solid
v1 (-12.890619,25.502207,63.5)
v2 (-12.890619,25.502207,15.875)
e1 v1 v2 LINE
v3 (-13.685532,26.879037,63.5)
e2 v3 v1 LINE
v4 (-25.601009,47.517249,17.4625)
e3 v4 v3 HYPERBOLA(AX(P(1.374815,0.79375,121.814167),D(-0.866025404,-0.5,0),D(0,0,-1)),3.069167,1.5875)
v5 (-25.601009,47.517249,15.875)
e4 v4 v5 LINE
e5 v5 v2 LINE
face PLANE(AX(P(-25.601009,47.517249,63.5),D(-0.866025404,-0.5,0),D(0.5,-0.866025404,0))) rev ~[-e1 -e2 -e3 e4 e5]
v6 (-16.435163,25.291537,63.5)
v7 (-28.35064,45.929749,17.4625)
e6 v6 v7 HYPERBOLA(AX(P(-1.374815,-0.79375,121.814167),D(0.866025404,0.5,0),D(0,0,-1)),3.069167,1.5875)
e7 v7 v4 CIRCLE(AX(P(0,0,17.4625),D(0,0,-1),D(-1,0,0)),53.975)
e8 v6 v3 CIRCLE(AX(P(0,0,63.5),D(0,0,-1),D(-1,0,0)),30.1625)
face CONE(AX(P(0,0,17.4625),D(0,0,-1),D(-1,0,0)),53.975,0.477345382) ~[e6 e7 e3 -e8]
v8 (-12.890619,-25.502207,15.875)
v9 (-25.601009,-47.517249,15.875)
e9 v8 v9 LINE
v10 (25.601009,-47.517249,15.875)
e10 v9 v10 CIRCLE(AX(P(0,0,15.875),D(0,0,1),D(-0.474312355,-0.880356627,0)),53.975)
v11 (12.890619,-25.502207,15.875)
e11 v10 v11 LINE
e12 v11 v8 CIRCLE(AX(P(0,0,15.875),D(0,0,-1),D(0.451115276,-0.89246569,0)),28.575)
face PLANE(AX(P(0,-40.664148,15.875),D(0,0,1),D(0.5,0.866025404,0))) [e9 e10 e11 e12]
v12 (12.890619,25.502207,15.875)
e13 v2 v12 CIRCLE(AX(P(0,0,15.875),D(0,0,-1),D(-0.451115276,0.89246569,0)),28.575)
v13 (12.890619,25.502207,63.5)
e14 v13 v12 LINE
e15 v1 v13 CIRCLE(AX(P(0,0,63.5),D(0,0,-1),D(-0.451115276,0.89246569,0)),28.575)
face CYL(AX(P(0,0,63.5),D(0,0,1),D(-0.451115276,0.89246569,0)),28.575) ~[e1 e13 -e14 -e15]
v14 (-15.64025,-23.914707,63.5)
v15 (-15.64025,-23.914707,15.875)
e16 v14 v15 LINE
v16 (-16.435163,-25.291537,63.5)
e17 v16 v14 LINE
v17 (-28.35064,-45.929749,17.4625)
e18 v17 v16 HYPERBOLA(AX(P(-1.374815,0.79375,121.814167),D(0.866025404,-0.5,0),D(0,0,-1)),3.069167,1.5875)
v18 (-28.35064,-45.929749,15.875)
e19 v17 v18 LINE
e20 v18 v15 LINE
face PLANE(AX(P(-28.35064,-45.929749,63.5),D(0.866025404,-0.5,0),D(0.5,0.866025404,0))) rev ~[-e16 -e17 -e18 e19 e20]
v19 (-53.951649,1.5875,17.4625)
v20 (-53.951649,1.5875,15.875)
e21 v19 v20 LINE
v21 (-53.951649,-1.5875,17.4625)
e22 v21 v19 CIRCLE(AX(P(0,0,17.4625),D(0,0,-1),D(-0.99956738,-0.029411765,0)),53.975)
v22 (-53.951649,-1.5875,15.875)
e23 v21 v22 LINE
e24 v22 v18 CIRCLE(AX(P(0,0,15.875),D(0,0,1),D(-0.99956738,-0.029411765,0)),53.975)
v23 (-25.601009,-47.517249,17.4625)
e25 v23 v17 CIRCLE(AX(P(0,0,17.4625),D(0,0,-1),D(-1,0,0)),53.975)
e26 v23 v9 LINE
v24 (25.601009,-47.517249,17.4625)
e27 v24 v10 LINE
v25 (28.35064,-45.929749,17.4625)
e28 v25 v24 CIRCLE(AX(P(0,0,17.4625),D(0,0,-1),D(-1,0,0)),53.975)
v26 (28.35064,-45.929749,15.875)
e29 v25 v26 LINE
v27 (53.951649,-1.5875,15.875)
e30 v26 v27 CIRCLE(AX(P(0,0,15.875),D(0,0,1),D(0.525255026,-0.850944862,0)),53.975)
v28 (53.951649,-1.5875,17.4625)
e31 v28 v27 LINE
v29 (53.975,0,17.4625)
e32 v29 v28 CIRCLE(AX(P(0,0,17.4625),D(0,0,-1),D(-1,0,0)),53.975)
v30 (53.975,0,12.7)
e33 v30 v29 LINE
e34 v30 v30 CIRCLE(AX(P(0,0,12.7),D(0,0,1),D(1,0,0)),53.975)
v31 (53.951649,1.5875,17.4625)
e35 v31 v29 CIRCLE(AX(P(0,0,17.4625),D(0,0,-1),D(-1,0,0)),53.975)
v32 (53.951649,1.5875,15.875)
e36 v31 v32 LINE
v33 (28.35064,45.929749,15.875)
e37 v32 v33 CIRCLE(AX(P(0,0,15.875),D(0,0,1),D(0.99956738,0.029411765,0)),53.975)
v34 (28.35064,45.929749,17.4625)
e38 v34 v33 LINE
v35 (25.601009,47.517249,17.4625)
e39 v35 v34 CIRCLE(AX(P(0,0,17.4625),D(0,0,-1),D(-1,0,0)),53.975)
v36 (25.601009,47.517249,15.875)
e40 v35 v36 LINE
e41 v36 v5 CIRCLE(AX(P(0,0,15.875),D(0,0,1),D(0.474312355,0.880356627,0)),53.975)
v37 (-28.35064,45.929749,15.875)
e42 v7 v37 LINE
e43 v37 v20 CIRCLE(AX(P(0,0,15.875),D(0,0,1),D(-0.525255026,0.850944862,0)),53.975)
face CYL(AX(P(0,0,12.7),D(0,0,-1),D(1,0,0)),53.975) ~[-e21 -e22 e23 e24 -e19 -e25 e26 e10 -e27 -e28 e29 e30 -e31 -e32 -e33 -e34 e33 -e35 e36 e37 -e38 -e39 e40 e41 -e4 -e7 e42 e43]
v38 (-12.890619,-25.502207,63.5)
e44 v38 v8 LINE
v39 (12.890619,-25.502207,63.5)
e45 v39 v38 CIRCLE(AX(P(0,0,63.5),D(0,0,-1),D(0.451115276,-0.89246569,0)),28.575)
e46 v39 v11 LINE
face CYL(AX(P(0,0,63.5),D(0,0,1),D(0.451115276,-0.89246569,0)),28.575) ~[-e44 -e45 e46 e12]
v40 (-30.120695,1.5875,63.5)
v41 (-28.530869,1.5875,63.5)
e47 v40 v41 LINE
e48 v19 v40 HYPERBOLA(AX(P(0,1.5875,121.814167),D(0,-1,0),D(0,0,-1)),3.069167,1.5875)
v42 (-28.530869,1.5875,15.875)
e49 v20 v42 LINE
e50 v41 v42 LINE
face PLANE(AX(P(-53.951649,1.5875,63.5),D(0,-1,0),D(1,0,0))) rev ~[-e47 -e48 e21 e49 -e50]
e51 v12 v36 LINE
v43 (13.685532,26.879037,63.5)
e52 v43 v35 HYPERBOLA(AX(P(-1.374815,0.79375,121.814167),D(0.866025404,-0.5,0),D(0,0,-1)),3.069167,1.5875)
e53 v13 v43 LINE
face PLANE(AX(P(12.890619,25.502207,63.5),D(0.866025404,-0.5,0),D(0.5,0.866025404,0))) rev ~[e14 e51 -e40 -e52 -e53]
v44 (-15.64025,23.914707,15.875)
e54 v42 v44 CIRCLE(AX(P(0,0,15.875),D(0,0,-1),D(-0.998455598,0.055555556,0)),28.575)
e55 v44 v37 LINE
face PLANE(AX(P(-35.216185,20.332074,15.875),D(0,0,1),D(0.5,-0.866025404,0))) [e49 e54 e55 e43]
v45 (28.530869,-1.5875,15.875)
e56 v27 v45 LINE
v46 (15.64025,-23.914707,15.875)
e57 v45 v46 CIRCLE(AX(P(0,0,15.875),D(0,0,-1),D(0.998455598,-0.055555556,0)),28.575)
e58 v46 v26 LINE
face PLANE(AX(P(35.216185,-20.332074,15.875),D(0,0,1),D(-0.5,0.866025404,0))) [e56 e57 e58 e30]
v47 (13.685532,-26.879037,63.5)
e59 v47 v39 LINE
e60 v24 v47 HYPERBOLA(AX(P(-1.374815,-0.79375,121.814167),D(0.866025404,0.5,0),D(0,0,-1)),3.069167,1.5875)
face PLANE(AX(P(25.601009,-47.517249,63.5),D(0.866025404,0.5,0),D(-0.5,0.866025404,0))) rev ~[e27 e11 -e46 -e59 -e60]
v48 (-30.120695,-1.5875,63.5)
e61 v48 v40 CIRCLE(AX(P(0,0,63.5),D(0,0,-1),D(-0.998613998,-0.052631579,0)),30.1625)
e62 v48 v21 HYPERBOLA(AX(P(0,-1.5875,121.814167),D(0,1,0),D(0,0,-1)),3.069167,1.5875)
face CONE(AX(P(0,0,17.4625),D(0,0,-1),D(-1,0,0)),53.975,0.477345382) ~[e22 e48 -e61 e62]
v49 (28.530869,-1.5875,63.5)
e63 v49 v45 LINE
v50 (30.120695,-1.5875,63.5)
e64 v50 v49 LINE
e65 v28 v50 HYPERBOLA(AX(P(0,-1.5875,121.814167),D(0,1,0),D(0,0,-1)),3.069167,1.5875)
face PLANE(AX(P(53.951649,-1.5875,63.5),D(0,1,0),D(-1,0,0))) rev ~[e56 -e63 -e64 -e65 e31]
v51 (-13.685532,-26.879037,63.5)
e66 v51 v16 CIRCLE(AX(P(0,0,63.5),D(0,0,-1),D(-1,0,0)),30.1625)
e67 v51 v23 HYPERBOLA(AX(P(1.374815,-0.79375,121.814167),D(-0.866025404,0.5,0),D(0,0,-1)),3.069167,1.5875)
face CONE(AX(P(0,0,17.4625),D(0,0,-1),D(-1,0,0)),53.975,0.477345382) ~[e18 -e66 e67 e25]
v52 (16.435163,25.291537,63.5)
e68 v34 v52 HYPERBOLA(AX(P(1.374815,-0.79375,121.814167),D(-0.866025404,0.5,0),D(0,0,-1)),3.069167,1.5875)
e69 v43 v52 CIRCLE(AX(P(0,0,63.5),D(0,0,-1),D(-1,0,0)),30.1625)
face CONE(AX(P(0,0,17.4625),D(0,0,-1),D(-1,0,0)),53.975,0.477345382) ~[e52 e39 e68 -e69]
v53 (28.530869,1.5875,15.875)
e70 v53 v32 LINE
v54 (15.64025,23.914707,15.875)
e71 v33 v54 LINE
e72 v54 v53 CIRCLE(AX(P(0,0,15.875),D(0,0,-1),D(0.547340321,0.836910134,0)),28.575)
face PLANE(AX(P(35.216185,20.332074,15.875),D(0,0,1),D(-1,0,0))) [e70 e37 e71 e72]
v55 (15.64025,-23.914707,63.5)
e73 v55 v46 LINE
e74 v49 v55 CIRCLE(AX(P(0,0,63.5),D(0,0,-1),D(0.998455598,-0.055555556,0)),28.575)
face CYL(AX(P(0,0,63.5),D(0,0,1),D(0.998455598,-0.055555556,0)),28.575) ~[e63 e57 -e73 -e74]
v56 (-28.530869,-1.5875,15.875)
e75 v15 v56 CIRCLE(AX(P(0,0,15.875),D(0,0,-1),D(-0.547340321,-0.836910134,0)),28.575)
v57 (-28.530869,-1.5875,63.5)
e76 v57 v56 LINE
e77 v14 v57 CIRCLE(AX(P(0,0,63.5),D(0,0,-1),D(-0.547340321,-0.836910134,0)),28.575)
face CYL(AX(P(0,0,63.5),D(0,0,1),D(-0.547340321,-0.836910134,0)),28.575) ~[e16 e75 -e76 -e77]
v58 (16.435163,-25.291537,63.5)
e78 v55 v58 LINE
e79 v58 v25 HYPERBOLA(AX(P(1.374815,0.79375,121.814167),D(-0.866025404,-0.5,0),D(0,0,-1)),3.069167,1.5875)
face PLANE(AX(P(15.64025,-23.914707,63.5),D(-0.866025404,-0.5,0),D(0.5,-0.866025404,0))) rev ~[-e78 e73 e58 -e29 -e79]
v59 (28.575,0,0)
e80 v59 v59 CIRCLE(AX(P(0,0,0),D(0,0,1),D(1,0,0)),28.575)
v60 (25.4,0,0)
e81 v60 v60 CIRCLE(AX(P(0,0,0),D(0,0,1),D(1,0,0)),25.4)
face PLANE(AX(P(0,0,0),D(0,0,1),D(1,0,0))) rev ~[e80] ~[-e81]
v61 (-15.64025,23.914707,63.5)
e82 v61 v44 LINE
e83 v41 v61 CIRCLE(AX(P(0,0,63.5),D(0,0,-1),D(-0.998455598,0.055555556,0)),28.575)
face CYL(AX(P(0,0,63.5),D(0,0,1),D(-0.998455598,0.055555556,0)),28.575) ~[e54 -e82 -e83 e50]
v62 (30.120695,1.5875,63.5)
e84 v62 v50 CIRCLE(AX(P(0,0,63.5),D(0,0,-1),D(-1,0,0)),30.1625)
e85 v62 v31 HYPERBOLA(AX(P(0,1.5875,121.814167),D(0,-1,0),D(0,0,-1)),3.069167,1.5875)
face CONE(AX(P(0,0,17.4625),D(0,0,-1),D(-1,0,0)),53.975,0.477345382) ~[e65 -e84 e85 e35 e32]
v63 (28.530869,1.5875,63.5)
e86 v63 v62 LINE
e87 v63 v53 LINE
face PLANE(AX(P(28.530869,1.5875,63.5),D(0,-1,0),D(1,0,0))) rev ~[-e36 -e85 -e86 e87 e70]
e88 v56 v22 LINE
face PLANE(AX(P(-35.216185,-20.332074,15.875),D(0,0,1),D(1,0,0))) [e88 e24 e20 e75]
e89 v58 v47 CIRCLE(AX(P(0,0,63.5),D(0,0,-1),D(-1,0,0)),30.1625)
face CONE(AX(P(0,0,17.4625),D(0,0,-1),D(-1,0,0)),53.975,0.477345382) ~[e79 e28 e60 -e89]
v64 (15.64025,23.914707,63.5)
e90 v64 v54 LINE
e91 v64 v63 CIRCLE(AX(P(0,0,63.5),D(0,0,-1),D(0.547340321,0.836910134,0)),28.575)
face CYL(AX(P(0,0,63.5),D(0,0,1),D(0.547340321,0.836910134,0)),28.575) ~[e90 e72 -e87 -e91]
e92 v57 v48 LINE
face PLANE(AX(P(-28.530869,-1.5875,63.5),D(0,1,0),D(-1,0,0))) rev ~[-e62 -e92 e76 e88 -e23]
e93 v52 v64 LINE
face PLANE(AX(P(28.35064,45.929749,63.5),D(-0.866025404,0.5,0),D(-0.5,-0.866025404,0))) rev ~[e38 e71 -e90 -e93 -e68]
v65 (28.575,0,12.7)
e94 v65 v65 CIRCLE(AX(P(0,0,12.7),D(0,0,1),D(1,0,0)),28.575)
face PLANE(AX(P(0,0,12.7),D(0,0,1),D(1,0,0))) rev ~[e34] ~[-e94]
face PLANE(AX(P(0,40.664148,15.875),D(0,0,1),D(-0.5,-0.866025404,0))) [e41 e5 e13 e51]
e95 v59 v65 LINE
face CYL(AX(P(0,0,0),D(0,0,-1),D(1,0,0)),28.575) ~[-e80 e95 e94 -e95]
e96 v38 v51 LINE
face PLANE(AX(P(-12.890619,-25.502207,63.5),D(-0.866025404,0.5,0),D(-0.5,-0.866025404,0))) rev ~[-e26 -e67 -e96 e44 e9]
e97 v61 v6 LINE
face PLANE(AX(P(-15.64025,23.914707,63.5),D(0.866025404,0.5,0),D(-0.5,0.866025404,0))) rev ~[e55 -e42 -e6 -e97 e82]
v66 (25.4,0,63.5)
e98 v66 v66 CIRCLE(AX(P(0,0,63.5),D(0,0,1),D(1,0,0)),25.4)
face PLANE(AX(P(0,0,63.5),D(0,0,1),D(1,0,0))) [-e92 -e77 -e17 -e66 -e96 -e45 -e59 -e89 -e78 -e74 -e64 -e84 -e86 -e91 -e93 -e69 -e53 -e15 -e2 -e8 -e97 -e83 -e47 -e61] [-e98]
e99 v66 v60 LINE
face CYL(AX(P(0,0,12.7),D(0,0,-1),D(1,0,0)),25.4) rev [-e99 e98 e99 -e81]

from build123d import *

# Parameters (mm, degrees)
F0_R            = 28.575
F0_R_2          = 25.4
F1_DEPTH        = 12.7
F2_R            = 53.975
F2_R_2          = 25.4
F3_DEPTH        = 50.8
F6_DEPTH        = 47.625
F6_COPIES_COUNT = 6


# Not quite as in the source:
# - a pattern or mirror of a feature is missing from the dataset's text; its kind, count and spacing are read off the source's solid


with BuildPart() as f1:
    # F0 (on Top) → F1 (new body)
    with BuildSketch(Plane.XY):
        Circle(F0_R)
        Circle(F0_R_2, mode=Mode.SUBTRACT)
    extrude(amount=F1_DEPTH)

    # F2 (on face) → F3 (join)
    with BuildSketch(Plane.XY.offset(12.7)):
        Circle(F2_R)
        Circle(F2_R_2, mode=Mode.SUBTRACT)
    extrude(amount=F3_DEPTH)

    # F5 (on face) → F6 (cut, through all)
    with BuildSketch(Plane.XY.offset(63.5)):
        with BuildLine():
            ThreePointArc((-15.6402496783, -23.9147070858), (-24.7466759131, -14.2875), (-28.5308686995, -1.5875))
            Line((-28.5308686995, -1.5875), (-53.9516493608, -1.5875))
            ThreePointArc((-53.9516493608, -1.5875), (-46.7437211693, -26.9875), (-28.3506400089, -45.9297489225))
            Line((-28.3506400089, -45.9297489225), (-15.6402496783, -23.9147070858))
        make_face()
    f6 = extrude(amount=-F6_DEPTH, mode=Mode.SUBTRACT)

    # F6_copies: F6 ×6 about axis
    f6_copies_axis = Axis((0, 0, 0), (0, 0, 1))
    for i in range(1, F6_COPIES_COUNT):
        add(f6.rotate(f6_copies_axis, i * 360 / F6_COPIES_COUNT), mode=Mode.SUBTRACT)

    # F7 (on Front) → F8 (revolve, cut)
    with BuildSketch(Plane.XZ):
        Polygon((-53.975, 17.4625), (-30.1625, 63.5), (-53.975, 63.5), align=None)
    revolve(axis=Axis((0, 0, 0), (0, 0, -1)), mode=Mode.SUBTRACT)


solid = f1.part
